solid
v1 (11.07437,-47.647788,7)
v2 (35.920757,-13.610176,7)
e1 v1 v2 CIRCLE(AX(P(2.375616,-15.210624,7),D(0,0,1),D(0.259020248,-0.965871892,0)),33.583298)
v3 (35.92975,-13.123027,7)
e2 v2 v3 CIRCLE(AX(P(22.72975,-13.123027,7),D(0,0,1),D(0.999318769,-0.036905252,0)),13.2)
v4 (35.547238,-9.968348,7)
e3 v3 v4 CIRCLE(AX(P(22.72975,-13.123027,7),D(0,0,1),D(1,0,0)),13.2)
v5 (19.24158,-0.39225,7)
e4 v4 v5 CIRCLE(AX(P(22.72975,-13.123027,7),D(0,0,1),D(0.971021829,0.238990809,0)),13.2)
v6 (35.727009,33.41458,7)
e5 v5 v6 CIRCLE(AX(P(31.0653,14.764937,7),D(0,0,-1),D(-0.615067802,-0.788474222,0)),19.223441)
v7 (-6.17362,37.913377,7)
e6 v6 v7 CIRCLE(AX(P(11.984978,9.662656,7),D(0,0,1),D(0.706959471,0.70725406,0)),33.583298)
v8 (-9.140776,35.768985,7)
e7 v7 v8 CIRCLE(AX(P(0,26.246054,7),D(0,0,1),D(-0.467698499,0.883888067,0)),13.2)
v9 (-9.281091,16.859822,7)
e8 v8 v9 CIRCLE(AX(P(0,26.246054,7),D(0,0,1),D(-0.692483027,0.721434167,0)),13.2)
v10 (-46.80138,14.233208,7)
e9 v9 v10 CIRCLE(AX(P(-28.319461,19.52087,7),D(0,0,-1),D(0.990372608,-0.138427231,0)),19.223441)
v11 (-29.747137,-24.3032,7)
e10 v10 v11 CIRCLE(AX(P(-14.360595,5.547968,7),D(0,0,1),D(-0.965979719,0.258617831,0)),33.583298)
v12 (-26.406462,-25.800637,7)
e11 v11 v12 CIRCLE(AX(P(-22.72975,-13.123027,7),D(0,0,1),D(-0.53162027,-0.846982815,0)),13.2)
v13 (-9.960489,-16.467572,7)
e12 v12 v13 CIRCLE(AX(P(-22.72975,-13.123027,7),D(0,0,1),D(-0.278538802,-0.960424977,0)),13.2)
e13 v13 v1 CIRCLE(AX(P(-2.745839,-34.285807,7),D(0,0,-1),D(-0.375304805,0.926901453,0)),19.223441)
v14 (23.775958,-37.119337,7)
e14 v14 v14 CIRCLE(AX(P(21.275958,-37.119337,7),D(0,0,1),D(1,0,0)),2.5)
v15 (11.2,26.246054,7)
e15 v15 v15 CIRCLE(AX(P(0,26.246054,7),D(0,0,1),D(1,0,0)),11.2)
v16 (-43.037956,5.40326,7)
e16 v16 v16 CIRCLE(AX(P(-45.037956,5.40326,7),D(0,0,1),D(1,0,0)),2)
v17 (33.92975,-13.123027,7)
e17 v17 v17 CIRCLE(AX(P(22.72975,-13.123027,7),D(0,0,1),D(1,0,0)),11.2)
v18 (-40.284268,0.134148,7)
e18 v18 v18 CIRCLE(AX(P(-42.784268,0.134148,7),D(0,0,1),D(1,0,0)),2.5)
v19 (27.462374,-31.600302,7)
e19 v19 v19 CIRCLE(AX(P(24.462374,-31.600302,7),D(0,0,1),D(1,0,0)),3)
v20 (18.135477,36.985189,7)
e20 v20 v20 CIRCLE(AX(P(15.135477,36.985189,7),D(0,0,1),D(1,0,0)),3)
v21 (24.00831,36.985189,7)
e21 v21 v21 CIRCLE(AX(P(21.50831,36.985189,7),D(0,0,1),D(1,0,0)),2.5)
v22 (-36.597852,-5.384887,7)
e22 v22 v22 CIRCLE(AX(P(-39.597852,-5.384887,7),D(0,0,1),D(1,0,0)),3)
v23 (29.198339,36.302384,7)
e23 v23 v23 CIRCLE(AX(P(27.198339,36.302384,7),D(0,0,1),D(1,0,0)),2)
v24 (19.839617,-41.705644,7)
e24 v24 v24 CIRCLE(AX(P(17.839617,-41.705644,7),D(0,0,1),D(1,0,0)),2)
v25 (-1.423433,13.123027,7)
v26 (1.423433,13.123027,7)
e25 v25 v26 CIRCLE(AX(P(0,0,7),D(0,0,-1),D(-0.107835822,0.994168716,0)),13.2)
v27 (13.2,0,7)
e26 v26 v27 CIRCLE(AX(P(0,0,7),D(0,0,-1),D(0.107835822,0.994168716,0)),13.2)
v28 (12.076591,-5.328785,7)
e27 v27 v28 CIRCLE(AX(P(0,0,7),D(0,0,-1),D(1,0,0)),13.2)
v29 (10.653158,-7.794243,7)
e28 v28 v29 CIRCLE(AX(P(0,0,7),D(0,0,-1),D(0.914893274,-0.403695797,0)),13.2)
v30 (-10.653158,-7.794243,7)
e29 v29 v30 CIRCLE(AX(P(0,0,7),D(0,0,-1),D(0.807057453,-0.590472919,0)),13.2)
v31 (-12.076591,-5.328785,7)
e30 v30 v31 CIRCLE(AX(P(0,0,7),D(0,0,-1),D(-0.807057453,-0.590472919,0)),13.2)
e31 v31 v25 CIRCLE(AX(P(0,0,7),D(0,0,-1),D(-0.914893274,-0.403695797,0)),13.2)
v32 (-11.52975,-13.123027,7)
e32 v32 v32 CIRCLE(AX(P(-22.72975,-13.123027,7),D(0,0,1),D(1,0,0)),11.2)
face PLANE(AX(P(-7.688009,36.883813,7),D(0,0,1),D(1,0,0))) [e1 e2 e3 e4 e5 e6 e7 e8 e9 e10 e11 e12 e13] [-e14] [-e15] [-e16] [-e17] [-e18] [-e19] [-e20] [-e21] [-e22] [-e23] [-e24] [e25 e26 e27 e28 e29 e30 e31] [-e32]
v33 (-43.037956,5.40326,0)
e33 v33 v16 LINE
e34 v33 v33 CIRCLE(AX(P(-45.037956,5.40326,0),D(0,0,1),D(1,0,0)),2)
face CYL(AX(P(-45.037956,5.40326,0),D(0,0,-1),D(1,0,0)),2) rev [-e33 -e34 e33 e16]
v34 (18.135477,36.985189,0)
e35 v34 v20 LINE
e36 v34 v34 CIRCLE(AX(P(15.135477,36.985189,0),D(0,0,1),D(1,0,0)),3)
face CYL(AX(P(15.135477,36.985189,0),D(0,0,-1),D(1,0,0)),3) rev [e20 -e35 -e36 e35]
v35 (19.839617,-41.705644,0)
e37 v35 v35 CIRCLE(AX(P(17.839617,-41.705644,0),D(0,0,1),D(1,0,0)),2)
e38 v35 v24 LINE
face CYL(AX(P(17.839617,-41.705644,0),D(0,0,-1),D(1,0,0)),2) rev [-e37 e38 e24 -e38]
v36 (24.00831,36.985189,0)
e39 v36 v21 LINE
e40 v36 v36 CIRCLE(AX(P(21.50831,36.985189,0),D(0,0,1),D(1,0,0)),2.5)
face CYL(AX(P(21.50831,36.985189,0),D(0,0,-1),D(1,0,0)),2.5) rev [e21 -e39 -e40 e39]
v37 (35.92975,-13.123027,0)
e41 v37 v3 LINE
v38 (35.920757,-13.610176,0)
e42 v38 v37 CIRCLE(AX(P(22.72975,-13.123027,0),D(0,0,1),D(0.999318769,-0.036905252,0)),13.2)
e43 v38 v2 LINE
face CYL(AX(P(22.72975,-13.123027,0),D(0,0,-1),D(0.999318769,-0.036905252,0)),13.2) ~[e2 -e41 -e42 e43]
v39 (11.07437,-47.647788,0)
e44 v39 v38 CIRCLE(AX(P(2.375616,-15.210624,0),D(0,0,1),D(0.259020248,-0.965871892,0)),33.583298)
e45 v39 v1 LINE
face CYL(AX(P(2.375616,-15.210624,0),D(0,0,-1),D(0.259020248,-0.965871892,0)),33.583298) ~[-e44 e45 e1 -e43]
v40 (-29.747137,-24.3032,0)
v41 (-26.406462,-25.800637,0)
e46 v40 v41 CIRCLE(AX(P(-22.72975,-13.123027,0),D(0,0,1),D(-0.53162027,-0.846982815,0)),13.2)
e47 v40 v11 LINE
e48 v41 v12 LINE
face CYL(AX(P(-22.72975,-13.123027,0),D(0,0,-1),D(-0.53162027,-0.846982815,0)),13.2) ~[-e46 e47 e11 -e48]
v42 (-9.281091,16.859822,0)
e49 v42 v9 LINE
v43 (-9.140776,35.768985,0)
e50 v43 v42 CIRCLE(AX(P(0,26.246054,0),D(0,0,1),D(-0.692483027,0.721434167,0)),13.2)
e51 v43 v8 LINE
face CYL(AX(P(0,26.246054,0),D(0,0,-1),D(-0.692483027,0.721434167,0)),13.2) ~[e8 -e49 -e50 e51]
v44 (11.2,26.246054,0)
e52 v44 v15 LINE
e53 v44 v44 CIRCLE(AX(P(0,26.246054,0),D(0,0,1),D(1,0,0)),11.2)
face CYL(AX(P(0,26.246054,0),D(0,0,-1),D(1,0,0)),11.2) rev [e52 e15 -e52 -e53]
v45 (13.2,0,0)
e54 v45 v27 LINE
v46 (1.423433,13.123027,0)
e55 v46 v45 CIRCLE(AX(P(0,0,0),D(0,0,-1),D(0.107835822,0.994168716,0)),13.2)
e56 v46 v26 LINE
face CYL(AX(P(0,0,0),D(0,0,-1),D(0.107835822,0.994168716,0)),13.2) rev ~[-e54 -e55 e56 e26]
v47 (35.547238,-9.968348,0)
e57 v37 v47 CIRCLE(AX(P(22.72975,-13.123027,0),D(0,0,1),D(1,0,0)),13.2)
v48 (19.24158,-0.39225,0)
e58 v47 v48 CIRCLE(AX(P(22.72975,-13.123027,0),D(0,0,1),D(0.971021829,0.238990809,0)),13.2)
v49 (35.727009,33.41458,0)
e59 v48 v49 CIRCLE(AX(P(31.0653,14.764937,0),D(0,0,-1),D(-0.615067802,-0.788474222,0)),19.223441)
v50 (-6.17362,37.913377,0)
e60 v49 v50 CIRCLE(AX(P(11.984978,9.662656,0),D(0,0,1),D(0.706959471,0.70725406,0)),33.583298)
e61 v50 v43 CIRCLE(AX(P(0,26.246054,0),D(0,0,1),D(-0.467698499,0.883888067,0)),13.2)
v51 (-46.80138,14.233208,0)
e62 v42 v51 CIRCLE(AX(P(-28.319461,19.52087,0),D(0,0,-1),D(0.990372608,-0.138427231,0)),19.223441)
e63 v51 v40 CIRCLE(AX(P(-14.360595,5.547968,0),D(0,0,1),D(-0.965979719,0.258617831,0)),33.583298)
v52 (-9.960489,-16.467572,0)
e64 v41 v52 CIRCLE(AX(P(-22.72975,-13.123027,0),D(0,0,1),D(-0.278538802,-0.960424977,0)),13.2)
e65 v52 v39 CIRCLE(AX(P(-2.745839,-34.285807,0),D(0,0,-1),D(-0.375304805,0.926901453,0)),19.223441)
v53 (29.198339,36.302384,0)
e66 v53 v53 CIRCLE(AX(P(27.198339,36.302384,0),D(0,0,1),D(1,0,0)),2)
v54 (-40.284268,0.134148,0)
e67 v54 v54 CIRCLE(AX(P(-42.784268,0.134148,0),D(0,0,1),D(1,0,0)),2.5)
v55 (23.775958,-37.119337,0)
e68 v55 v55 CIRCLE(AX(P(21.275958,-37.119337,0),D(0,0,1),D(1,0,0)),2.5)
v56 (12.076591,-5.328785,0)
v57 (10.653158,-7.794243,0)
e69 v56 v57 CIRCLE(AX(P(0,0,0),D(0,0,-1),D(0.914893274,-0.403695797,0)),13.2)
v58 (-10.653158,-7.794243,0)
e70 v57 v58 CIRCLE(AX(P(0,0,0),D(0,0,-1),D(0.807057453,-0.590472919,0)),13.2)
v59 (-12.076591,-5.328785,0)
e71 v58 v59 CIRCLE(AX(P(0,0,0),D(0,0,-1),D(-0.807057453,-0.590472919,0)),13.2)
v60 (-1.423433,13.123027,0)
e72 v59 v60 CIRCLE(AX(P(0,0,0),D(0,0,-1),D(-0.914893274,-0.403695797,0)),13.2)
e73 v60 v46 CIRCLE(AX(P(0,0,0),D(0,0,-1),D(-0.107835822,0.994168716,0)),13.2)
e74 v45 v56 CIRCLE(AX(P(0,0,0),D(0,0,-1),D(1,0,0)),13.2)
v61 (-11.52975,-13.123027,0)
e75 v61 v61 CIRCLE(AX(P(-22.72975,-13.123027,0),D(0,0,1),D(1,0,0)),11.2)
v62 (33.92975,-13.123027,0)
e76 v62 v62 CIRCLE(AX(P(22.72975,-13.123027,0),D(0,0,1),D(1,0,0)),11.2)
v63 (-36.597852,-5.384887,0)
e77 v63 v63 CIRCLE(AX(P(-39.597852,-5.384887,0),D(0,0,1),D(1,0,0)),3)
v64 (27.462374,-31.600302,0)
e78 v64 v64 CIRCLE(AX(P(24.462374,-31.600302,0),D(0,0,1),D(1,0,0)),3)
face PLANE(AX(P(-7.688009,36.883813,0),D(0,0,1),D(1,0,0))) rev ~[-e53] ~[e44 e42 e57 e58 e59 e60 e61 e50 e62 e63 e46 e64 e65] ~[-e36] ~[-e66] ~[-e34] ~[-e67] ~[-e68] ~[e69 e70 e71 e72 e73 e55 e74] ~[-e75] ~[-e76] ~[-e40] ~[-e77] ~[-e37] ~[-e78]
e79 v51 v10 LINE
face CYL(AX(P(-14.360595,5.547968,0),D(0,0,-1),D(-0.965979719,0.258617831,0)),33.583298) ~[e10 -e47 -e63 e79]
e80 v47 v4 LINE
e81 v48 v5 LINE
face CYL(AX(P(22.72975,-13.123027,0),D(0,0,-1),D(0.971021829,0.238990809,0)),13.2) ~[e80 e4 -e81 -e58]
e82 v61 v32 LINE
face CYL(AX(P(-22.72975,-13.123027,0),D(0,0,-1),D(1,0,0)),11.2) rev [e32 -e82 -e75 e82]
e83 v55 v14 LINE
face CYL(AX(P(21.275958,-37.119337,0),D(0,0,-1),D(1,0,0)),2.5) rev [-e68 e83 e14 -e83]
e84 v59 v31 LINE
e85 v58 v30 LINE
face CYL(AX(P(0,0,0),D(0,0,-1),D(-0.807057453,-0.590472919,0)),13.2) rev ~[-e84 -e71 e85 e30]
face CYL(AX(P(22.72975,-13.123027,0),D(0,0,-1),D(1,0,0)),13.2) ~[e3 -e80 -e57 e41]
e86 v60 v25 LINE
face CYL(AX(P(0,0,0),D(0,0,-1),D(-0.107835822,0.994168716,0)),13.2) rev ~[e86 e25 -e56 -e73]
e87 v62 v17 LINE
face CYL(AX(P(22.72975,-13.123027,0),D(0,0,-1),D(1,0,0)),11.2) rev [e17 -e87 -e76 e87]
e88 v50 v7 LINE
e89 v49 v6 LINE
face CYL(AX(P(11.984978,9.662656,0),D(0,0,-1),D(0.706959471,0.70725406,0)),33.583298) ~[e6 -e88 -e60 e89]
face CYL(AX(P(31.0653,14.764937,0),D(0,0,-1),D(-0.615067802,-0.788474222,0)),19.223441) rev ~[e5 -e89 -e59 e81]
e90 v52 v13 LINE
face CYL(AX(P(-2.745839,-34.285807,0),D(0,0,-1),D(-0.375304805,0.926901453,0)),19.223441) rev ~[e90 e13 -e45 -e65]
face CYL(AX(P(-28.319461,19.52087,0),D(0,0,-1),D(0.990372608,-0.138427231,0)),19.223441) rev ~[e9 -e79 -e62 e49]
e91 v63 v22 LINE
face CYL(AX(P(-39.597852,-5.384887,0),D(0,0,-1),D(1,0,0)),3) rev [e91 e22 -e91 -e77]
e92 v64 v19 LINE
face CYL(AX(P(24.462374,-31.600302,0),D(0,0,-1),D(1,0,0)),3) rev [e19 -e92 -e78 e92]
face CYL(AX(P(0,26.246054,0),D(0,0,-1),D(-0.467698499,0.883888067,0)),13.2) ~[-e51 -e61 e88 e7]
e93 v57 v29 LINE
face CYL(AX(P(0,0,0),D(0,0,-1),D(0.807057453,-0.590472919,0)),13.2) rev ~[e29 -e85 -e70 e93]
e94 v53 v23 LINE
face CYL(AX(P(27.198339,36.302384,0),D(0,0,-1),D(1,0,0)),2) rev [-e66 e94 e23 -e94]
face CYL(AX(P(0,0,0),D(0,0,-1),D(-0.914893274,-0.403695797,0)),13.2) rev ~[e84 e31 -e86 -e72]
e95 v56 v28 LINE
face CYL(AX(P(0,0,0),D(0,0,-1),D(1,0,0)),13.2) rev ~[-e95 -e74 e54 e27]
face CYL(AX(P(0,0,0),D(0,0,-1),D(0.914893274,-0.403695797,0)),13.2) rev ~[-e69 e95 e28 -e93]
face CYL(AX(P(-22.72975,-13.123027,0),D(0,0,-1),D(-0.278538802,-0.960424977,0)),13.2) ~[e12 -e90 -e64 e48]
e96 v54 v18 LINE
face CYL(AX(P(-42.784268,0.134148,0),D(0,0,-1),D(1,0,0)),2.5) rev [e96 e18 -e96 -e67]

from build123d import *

# Parameters (mm, degrees)
F0_R     = 11.2
F0_R_2   = 3
F0_R_3   = 2.5
F0_R_4   = 2
F1_DEPTH = 7


# Not quite as in the source:
# - a feature names something its author has since deleted; it is built from what else it names


with BuildPart() as f1:
    # F0 (on Top) → F1 (new body)
    with BuildSketch(Plane.XY):
        with BuildLine():
            ThreePointArc((-6.1736201838, 37.9133765769), (-7.7319005407, 36.9445453014), (-9.1407759551, 35.7689851037))
            ThreePointArc((-9.1407759551, 35.7689851037), (-7.6864399565, 36.8816423115), (-6.1736201838, 37.9133765769))
        make_face()
        with BuildLine():
            ThreePointArc((-26.4064617899, -25.8006367392), (-28.0972191968, -25.0974734227), (-29.7471371669, -24.3032002009))
            ThreePointArc((-29.7471371669, -24.3032002009), (-28.1289644919, -25.1682949385), (-26.4064617899, -25.8006367392))
        make_face()
        with BuildLine():
            ThreePointArc((35.929749598, -13.123027049), (35.8337727119, -11.5341349098), (35.5472377449, -9.9683483645))
            ThreePointArc((35.5472377449, -9.9683483645), (35.7836591533, -11.7841688888), (35.9207573507, -13.610176376))
            ThreePointArc((35.9207573507, -13.610176376), (35.9275013447, -13.3666432057), (35.929749598, -13.123027049))
        make_face()
        with BuildLine():
            ThreePointArc((-6.1736201838, 37.9133765769), (-7.6864399565, 36.8816423115), (-9.1407759551, 35.7689851037))
            ThreePointArc((-9.1407759551, 35.7689851037), (-13.1996365954, 26.3440017791), (-9.2810910796, 16.8598222464))
            ThreePointArc((-9.2810910796, 16.8598222464), (-5.669005002, 14.3253837189), (-1.4234328474, 13.123027049))
            ThreePointArc((-1.4234328474, 13.123027049), (0, 13.2), (1.4234328474, 13.123027049))
            ThreePointArc((1.4234328474, 13.123027049), (9.824187335, 17.4298563231), (13.2, 26.246054098))
            ThreePointArc((13.2, 26.246054098), (6.8098536539, 37.5538343052), (-6.1736201838, 37.9133765769))
        make_face()
        with Locations((0, 26.246054098)):
            Circle(F0_R, mode=Mode.SUBTRACT)
        with BuildLine():
            ThreePointArc((-10.6531583753, -7.7942425309), (-11.43153533, -6.6), (-12.0765912227, -5.3287845181))
            ThreePointArc((-12.0765912227, -5.3287845181), (-32.389553942, -4.1270179319), (-29.7471371669, -24.3032002009))
            ThreePointArc((-29.7471371669, -24.3032002009), (-28.0972191968, -25.0974734227), (-26.4064617899, -25.8006367392))
            ThreePointArc((-26.4064617899, -25.8006367392), (-16.2147564803, -24.6032215019), (-9.9604888289, -16.467571773))
            ThreePointArc((-9.9604888289, -16.467571773), (-9.6378772691, -14.8091109508), (-9.529749598, -13.123027049))
            ThreePointArc((-9.529749598, -13.123027049), (-9.8136549069, -10.4000694786), (-10.6531583753, -7.7942425309))
        make_face()
        with Locations((-22.729749598, -13.123027049)):
            Circle(F0_R, mode=Mode.SUBTRACT)
        with BuildLine():
            ThreePointArc((35.5472377449, -9.9683483645), (29.4143930758, -1.7407802772), (19.2415799085, -0.3922504734))
            ThreePointArc((19.2415799085, -0.3922504734), (15.2406487206, -2.2531895135), (12.0765912227, -5.3287845181))
            ThreePointArc((12.0765912227, -5.3287845181), (11.43153533, -6.6), (10.6531583753, -7.7942425309))
            ThreePointArc((10.6531583753, -7.7942425309), (19.7688793419, -25.9866675651), (35.9207573507, -13.610176376))
            ThreePointArc((35.9207573507, -13.610176376), (35.7836591533, -11.7841688888), (35.5472377449, -9.9683483645))
        make_face()
        with Locations((22.729749598, -13.123027049)):
            Circle(F0_R, mode=Mode.SUBTRACT)
        with BuildLine():
            ThreePointArc((-1.4234328474, 13.123027049), (-5.669005002, 14.3253837189), (-9.2810910796, 16.8598222464))
            ThreePointArc((-9.2810910796, 16.8598222464), (-26.9770057804, 0.3443606169), (-46.801379663, 14.2332075847))
            ThreePointArc((-46.801379663, 14.2332075847), (-45.0709674202, -8.0428719823), (-29.7471371669, -24.3032002009))
            ThreePointArc((-29.7471371669, -24.3032002009), (-32.389553942, -4.1270179319), (-12.0765912227, -5.3287845181))
            ThreePointArc((-12.0765912227, -5.3287845181), (-11.43153533, 6.6), (-1.4234328474, 13.123027049))
        make_face()
        with Locations((-39.597851646, -5.3848865237)):
            Circle(F0_R_2, mode=Mode.SUBTRACT)
        with Locations((-42.7842679926, 0.1341484827)):
            Circle(F0_R_3, mode=Mode.SUBTRACT)
        with Locations((-45.0379561931, 5.4032604173)):
            Circle(F0_R_4, mode=Mode.SUBTRACT)
        with BuildLine():
            ThreePointArc((35.7270091772, 33.4145799279), (15.570152254, 43.0540387502), (-6.1736201838, 37.9133765769))
            ThreePointArc((-6.1736201838, 37.9133765769), (6.8098536539, 37.5538343052), (13.2, 26.246054098))
            ThreePointArc((13.2, 26.246054098), (9.824187335, 17.4298563231), (1.4234328474, 13.123027049))
            ThreePointArc((1.4234328474, 13.123027049), (9.824187335, 8.816197775), (13.2, 0))
            ThreePointArc((13.2, 0), (12.9160946911, -2.7229575704), (12.0765912227, -5.3287845181))
            ThreePointArc((12.0765912227, -5.3287845181), (15.2406487206, -2.2531895135), (19.2415799085, -0.3922504734))
            ThreePointArc((19.2415799085, -0.3922504734), (13.7867279325, 23.1905920154), (35.7270091772, 33.4145799279))
        make_face()
        with Locations((15.135477297, 36.9851887226)):
            Circle(F0_R_2, mode=Mode.SUBTRACT)
        with Locations((21.5083099902, 36.9851887226)):
            Circle(F0_R_3, mode=Mode.SUBTRACT)
        with Locations((27.1983388811, 36.3023839891)):
            Circle(F0_R_4, mode=Mode.SUBTRACT)
        with BuildLine():
            ThreePointArc((10.6531583753, -7.7942425309), (0, -13.2), (-10.6531583753, -7.7942425309))
            ThreePointArc((-10.6531583753, -7.7942425309), (-9.8136549069, -10.4000694786), (-9.529749598, -13.123027049))
            ThreePointArc((-9.529749598, -13.123027049), (-9.6378772691, -14.8091109508), (-9.9604888289, -16.467571773))
            ThreePointArc((-9.9604888289, -16.467571773), (13.1902778479, -23.5349526323), (11.0743704858, -47.6477875127))
            ThreePointArc((11.0743704858, -47.6477875127), (29.5008151662, -35.0111667679), (35.9207573507, -13.610176376))
            ThreePointArc((35.9207573507, -13.610176376), (19.7688793419, -25.9866675651), (10.6531583753, -7.7942425309))
        make_face()
        with Locations((17.8396173119, -41.7056444063)):
            Circle(F0_R_4, mode=Mode.SUBTRACT)
        with Locations((21.2759580025, -37.1193372053)):
            Circle(F0_R_3, mode=Mode.SUBTRACT)
        with Locations((24.462374349, -31.6003021989)):
            Circle(F0_R_2, mode=Mode.SUBTRACT)
    extrude(amount=F1_DEPTH)


solid = f1.part
